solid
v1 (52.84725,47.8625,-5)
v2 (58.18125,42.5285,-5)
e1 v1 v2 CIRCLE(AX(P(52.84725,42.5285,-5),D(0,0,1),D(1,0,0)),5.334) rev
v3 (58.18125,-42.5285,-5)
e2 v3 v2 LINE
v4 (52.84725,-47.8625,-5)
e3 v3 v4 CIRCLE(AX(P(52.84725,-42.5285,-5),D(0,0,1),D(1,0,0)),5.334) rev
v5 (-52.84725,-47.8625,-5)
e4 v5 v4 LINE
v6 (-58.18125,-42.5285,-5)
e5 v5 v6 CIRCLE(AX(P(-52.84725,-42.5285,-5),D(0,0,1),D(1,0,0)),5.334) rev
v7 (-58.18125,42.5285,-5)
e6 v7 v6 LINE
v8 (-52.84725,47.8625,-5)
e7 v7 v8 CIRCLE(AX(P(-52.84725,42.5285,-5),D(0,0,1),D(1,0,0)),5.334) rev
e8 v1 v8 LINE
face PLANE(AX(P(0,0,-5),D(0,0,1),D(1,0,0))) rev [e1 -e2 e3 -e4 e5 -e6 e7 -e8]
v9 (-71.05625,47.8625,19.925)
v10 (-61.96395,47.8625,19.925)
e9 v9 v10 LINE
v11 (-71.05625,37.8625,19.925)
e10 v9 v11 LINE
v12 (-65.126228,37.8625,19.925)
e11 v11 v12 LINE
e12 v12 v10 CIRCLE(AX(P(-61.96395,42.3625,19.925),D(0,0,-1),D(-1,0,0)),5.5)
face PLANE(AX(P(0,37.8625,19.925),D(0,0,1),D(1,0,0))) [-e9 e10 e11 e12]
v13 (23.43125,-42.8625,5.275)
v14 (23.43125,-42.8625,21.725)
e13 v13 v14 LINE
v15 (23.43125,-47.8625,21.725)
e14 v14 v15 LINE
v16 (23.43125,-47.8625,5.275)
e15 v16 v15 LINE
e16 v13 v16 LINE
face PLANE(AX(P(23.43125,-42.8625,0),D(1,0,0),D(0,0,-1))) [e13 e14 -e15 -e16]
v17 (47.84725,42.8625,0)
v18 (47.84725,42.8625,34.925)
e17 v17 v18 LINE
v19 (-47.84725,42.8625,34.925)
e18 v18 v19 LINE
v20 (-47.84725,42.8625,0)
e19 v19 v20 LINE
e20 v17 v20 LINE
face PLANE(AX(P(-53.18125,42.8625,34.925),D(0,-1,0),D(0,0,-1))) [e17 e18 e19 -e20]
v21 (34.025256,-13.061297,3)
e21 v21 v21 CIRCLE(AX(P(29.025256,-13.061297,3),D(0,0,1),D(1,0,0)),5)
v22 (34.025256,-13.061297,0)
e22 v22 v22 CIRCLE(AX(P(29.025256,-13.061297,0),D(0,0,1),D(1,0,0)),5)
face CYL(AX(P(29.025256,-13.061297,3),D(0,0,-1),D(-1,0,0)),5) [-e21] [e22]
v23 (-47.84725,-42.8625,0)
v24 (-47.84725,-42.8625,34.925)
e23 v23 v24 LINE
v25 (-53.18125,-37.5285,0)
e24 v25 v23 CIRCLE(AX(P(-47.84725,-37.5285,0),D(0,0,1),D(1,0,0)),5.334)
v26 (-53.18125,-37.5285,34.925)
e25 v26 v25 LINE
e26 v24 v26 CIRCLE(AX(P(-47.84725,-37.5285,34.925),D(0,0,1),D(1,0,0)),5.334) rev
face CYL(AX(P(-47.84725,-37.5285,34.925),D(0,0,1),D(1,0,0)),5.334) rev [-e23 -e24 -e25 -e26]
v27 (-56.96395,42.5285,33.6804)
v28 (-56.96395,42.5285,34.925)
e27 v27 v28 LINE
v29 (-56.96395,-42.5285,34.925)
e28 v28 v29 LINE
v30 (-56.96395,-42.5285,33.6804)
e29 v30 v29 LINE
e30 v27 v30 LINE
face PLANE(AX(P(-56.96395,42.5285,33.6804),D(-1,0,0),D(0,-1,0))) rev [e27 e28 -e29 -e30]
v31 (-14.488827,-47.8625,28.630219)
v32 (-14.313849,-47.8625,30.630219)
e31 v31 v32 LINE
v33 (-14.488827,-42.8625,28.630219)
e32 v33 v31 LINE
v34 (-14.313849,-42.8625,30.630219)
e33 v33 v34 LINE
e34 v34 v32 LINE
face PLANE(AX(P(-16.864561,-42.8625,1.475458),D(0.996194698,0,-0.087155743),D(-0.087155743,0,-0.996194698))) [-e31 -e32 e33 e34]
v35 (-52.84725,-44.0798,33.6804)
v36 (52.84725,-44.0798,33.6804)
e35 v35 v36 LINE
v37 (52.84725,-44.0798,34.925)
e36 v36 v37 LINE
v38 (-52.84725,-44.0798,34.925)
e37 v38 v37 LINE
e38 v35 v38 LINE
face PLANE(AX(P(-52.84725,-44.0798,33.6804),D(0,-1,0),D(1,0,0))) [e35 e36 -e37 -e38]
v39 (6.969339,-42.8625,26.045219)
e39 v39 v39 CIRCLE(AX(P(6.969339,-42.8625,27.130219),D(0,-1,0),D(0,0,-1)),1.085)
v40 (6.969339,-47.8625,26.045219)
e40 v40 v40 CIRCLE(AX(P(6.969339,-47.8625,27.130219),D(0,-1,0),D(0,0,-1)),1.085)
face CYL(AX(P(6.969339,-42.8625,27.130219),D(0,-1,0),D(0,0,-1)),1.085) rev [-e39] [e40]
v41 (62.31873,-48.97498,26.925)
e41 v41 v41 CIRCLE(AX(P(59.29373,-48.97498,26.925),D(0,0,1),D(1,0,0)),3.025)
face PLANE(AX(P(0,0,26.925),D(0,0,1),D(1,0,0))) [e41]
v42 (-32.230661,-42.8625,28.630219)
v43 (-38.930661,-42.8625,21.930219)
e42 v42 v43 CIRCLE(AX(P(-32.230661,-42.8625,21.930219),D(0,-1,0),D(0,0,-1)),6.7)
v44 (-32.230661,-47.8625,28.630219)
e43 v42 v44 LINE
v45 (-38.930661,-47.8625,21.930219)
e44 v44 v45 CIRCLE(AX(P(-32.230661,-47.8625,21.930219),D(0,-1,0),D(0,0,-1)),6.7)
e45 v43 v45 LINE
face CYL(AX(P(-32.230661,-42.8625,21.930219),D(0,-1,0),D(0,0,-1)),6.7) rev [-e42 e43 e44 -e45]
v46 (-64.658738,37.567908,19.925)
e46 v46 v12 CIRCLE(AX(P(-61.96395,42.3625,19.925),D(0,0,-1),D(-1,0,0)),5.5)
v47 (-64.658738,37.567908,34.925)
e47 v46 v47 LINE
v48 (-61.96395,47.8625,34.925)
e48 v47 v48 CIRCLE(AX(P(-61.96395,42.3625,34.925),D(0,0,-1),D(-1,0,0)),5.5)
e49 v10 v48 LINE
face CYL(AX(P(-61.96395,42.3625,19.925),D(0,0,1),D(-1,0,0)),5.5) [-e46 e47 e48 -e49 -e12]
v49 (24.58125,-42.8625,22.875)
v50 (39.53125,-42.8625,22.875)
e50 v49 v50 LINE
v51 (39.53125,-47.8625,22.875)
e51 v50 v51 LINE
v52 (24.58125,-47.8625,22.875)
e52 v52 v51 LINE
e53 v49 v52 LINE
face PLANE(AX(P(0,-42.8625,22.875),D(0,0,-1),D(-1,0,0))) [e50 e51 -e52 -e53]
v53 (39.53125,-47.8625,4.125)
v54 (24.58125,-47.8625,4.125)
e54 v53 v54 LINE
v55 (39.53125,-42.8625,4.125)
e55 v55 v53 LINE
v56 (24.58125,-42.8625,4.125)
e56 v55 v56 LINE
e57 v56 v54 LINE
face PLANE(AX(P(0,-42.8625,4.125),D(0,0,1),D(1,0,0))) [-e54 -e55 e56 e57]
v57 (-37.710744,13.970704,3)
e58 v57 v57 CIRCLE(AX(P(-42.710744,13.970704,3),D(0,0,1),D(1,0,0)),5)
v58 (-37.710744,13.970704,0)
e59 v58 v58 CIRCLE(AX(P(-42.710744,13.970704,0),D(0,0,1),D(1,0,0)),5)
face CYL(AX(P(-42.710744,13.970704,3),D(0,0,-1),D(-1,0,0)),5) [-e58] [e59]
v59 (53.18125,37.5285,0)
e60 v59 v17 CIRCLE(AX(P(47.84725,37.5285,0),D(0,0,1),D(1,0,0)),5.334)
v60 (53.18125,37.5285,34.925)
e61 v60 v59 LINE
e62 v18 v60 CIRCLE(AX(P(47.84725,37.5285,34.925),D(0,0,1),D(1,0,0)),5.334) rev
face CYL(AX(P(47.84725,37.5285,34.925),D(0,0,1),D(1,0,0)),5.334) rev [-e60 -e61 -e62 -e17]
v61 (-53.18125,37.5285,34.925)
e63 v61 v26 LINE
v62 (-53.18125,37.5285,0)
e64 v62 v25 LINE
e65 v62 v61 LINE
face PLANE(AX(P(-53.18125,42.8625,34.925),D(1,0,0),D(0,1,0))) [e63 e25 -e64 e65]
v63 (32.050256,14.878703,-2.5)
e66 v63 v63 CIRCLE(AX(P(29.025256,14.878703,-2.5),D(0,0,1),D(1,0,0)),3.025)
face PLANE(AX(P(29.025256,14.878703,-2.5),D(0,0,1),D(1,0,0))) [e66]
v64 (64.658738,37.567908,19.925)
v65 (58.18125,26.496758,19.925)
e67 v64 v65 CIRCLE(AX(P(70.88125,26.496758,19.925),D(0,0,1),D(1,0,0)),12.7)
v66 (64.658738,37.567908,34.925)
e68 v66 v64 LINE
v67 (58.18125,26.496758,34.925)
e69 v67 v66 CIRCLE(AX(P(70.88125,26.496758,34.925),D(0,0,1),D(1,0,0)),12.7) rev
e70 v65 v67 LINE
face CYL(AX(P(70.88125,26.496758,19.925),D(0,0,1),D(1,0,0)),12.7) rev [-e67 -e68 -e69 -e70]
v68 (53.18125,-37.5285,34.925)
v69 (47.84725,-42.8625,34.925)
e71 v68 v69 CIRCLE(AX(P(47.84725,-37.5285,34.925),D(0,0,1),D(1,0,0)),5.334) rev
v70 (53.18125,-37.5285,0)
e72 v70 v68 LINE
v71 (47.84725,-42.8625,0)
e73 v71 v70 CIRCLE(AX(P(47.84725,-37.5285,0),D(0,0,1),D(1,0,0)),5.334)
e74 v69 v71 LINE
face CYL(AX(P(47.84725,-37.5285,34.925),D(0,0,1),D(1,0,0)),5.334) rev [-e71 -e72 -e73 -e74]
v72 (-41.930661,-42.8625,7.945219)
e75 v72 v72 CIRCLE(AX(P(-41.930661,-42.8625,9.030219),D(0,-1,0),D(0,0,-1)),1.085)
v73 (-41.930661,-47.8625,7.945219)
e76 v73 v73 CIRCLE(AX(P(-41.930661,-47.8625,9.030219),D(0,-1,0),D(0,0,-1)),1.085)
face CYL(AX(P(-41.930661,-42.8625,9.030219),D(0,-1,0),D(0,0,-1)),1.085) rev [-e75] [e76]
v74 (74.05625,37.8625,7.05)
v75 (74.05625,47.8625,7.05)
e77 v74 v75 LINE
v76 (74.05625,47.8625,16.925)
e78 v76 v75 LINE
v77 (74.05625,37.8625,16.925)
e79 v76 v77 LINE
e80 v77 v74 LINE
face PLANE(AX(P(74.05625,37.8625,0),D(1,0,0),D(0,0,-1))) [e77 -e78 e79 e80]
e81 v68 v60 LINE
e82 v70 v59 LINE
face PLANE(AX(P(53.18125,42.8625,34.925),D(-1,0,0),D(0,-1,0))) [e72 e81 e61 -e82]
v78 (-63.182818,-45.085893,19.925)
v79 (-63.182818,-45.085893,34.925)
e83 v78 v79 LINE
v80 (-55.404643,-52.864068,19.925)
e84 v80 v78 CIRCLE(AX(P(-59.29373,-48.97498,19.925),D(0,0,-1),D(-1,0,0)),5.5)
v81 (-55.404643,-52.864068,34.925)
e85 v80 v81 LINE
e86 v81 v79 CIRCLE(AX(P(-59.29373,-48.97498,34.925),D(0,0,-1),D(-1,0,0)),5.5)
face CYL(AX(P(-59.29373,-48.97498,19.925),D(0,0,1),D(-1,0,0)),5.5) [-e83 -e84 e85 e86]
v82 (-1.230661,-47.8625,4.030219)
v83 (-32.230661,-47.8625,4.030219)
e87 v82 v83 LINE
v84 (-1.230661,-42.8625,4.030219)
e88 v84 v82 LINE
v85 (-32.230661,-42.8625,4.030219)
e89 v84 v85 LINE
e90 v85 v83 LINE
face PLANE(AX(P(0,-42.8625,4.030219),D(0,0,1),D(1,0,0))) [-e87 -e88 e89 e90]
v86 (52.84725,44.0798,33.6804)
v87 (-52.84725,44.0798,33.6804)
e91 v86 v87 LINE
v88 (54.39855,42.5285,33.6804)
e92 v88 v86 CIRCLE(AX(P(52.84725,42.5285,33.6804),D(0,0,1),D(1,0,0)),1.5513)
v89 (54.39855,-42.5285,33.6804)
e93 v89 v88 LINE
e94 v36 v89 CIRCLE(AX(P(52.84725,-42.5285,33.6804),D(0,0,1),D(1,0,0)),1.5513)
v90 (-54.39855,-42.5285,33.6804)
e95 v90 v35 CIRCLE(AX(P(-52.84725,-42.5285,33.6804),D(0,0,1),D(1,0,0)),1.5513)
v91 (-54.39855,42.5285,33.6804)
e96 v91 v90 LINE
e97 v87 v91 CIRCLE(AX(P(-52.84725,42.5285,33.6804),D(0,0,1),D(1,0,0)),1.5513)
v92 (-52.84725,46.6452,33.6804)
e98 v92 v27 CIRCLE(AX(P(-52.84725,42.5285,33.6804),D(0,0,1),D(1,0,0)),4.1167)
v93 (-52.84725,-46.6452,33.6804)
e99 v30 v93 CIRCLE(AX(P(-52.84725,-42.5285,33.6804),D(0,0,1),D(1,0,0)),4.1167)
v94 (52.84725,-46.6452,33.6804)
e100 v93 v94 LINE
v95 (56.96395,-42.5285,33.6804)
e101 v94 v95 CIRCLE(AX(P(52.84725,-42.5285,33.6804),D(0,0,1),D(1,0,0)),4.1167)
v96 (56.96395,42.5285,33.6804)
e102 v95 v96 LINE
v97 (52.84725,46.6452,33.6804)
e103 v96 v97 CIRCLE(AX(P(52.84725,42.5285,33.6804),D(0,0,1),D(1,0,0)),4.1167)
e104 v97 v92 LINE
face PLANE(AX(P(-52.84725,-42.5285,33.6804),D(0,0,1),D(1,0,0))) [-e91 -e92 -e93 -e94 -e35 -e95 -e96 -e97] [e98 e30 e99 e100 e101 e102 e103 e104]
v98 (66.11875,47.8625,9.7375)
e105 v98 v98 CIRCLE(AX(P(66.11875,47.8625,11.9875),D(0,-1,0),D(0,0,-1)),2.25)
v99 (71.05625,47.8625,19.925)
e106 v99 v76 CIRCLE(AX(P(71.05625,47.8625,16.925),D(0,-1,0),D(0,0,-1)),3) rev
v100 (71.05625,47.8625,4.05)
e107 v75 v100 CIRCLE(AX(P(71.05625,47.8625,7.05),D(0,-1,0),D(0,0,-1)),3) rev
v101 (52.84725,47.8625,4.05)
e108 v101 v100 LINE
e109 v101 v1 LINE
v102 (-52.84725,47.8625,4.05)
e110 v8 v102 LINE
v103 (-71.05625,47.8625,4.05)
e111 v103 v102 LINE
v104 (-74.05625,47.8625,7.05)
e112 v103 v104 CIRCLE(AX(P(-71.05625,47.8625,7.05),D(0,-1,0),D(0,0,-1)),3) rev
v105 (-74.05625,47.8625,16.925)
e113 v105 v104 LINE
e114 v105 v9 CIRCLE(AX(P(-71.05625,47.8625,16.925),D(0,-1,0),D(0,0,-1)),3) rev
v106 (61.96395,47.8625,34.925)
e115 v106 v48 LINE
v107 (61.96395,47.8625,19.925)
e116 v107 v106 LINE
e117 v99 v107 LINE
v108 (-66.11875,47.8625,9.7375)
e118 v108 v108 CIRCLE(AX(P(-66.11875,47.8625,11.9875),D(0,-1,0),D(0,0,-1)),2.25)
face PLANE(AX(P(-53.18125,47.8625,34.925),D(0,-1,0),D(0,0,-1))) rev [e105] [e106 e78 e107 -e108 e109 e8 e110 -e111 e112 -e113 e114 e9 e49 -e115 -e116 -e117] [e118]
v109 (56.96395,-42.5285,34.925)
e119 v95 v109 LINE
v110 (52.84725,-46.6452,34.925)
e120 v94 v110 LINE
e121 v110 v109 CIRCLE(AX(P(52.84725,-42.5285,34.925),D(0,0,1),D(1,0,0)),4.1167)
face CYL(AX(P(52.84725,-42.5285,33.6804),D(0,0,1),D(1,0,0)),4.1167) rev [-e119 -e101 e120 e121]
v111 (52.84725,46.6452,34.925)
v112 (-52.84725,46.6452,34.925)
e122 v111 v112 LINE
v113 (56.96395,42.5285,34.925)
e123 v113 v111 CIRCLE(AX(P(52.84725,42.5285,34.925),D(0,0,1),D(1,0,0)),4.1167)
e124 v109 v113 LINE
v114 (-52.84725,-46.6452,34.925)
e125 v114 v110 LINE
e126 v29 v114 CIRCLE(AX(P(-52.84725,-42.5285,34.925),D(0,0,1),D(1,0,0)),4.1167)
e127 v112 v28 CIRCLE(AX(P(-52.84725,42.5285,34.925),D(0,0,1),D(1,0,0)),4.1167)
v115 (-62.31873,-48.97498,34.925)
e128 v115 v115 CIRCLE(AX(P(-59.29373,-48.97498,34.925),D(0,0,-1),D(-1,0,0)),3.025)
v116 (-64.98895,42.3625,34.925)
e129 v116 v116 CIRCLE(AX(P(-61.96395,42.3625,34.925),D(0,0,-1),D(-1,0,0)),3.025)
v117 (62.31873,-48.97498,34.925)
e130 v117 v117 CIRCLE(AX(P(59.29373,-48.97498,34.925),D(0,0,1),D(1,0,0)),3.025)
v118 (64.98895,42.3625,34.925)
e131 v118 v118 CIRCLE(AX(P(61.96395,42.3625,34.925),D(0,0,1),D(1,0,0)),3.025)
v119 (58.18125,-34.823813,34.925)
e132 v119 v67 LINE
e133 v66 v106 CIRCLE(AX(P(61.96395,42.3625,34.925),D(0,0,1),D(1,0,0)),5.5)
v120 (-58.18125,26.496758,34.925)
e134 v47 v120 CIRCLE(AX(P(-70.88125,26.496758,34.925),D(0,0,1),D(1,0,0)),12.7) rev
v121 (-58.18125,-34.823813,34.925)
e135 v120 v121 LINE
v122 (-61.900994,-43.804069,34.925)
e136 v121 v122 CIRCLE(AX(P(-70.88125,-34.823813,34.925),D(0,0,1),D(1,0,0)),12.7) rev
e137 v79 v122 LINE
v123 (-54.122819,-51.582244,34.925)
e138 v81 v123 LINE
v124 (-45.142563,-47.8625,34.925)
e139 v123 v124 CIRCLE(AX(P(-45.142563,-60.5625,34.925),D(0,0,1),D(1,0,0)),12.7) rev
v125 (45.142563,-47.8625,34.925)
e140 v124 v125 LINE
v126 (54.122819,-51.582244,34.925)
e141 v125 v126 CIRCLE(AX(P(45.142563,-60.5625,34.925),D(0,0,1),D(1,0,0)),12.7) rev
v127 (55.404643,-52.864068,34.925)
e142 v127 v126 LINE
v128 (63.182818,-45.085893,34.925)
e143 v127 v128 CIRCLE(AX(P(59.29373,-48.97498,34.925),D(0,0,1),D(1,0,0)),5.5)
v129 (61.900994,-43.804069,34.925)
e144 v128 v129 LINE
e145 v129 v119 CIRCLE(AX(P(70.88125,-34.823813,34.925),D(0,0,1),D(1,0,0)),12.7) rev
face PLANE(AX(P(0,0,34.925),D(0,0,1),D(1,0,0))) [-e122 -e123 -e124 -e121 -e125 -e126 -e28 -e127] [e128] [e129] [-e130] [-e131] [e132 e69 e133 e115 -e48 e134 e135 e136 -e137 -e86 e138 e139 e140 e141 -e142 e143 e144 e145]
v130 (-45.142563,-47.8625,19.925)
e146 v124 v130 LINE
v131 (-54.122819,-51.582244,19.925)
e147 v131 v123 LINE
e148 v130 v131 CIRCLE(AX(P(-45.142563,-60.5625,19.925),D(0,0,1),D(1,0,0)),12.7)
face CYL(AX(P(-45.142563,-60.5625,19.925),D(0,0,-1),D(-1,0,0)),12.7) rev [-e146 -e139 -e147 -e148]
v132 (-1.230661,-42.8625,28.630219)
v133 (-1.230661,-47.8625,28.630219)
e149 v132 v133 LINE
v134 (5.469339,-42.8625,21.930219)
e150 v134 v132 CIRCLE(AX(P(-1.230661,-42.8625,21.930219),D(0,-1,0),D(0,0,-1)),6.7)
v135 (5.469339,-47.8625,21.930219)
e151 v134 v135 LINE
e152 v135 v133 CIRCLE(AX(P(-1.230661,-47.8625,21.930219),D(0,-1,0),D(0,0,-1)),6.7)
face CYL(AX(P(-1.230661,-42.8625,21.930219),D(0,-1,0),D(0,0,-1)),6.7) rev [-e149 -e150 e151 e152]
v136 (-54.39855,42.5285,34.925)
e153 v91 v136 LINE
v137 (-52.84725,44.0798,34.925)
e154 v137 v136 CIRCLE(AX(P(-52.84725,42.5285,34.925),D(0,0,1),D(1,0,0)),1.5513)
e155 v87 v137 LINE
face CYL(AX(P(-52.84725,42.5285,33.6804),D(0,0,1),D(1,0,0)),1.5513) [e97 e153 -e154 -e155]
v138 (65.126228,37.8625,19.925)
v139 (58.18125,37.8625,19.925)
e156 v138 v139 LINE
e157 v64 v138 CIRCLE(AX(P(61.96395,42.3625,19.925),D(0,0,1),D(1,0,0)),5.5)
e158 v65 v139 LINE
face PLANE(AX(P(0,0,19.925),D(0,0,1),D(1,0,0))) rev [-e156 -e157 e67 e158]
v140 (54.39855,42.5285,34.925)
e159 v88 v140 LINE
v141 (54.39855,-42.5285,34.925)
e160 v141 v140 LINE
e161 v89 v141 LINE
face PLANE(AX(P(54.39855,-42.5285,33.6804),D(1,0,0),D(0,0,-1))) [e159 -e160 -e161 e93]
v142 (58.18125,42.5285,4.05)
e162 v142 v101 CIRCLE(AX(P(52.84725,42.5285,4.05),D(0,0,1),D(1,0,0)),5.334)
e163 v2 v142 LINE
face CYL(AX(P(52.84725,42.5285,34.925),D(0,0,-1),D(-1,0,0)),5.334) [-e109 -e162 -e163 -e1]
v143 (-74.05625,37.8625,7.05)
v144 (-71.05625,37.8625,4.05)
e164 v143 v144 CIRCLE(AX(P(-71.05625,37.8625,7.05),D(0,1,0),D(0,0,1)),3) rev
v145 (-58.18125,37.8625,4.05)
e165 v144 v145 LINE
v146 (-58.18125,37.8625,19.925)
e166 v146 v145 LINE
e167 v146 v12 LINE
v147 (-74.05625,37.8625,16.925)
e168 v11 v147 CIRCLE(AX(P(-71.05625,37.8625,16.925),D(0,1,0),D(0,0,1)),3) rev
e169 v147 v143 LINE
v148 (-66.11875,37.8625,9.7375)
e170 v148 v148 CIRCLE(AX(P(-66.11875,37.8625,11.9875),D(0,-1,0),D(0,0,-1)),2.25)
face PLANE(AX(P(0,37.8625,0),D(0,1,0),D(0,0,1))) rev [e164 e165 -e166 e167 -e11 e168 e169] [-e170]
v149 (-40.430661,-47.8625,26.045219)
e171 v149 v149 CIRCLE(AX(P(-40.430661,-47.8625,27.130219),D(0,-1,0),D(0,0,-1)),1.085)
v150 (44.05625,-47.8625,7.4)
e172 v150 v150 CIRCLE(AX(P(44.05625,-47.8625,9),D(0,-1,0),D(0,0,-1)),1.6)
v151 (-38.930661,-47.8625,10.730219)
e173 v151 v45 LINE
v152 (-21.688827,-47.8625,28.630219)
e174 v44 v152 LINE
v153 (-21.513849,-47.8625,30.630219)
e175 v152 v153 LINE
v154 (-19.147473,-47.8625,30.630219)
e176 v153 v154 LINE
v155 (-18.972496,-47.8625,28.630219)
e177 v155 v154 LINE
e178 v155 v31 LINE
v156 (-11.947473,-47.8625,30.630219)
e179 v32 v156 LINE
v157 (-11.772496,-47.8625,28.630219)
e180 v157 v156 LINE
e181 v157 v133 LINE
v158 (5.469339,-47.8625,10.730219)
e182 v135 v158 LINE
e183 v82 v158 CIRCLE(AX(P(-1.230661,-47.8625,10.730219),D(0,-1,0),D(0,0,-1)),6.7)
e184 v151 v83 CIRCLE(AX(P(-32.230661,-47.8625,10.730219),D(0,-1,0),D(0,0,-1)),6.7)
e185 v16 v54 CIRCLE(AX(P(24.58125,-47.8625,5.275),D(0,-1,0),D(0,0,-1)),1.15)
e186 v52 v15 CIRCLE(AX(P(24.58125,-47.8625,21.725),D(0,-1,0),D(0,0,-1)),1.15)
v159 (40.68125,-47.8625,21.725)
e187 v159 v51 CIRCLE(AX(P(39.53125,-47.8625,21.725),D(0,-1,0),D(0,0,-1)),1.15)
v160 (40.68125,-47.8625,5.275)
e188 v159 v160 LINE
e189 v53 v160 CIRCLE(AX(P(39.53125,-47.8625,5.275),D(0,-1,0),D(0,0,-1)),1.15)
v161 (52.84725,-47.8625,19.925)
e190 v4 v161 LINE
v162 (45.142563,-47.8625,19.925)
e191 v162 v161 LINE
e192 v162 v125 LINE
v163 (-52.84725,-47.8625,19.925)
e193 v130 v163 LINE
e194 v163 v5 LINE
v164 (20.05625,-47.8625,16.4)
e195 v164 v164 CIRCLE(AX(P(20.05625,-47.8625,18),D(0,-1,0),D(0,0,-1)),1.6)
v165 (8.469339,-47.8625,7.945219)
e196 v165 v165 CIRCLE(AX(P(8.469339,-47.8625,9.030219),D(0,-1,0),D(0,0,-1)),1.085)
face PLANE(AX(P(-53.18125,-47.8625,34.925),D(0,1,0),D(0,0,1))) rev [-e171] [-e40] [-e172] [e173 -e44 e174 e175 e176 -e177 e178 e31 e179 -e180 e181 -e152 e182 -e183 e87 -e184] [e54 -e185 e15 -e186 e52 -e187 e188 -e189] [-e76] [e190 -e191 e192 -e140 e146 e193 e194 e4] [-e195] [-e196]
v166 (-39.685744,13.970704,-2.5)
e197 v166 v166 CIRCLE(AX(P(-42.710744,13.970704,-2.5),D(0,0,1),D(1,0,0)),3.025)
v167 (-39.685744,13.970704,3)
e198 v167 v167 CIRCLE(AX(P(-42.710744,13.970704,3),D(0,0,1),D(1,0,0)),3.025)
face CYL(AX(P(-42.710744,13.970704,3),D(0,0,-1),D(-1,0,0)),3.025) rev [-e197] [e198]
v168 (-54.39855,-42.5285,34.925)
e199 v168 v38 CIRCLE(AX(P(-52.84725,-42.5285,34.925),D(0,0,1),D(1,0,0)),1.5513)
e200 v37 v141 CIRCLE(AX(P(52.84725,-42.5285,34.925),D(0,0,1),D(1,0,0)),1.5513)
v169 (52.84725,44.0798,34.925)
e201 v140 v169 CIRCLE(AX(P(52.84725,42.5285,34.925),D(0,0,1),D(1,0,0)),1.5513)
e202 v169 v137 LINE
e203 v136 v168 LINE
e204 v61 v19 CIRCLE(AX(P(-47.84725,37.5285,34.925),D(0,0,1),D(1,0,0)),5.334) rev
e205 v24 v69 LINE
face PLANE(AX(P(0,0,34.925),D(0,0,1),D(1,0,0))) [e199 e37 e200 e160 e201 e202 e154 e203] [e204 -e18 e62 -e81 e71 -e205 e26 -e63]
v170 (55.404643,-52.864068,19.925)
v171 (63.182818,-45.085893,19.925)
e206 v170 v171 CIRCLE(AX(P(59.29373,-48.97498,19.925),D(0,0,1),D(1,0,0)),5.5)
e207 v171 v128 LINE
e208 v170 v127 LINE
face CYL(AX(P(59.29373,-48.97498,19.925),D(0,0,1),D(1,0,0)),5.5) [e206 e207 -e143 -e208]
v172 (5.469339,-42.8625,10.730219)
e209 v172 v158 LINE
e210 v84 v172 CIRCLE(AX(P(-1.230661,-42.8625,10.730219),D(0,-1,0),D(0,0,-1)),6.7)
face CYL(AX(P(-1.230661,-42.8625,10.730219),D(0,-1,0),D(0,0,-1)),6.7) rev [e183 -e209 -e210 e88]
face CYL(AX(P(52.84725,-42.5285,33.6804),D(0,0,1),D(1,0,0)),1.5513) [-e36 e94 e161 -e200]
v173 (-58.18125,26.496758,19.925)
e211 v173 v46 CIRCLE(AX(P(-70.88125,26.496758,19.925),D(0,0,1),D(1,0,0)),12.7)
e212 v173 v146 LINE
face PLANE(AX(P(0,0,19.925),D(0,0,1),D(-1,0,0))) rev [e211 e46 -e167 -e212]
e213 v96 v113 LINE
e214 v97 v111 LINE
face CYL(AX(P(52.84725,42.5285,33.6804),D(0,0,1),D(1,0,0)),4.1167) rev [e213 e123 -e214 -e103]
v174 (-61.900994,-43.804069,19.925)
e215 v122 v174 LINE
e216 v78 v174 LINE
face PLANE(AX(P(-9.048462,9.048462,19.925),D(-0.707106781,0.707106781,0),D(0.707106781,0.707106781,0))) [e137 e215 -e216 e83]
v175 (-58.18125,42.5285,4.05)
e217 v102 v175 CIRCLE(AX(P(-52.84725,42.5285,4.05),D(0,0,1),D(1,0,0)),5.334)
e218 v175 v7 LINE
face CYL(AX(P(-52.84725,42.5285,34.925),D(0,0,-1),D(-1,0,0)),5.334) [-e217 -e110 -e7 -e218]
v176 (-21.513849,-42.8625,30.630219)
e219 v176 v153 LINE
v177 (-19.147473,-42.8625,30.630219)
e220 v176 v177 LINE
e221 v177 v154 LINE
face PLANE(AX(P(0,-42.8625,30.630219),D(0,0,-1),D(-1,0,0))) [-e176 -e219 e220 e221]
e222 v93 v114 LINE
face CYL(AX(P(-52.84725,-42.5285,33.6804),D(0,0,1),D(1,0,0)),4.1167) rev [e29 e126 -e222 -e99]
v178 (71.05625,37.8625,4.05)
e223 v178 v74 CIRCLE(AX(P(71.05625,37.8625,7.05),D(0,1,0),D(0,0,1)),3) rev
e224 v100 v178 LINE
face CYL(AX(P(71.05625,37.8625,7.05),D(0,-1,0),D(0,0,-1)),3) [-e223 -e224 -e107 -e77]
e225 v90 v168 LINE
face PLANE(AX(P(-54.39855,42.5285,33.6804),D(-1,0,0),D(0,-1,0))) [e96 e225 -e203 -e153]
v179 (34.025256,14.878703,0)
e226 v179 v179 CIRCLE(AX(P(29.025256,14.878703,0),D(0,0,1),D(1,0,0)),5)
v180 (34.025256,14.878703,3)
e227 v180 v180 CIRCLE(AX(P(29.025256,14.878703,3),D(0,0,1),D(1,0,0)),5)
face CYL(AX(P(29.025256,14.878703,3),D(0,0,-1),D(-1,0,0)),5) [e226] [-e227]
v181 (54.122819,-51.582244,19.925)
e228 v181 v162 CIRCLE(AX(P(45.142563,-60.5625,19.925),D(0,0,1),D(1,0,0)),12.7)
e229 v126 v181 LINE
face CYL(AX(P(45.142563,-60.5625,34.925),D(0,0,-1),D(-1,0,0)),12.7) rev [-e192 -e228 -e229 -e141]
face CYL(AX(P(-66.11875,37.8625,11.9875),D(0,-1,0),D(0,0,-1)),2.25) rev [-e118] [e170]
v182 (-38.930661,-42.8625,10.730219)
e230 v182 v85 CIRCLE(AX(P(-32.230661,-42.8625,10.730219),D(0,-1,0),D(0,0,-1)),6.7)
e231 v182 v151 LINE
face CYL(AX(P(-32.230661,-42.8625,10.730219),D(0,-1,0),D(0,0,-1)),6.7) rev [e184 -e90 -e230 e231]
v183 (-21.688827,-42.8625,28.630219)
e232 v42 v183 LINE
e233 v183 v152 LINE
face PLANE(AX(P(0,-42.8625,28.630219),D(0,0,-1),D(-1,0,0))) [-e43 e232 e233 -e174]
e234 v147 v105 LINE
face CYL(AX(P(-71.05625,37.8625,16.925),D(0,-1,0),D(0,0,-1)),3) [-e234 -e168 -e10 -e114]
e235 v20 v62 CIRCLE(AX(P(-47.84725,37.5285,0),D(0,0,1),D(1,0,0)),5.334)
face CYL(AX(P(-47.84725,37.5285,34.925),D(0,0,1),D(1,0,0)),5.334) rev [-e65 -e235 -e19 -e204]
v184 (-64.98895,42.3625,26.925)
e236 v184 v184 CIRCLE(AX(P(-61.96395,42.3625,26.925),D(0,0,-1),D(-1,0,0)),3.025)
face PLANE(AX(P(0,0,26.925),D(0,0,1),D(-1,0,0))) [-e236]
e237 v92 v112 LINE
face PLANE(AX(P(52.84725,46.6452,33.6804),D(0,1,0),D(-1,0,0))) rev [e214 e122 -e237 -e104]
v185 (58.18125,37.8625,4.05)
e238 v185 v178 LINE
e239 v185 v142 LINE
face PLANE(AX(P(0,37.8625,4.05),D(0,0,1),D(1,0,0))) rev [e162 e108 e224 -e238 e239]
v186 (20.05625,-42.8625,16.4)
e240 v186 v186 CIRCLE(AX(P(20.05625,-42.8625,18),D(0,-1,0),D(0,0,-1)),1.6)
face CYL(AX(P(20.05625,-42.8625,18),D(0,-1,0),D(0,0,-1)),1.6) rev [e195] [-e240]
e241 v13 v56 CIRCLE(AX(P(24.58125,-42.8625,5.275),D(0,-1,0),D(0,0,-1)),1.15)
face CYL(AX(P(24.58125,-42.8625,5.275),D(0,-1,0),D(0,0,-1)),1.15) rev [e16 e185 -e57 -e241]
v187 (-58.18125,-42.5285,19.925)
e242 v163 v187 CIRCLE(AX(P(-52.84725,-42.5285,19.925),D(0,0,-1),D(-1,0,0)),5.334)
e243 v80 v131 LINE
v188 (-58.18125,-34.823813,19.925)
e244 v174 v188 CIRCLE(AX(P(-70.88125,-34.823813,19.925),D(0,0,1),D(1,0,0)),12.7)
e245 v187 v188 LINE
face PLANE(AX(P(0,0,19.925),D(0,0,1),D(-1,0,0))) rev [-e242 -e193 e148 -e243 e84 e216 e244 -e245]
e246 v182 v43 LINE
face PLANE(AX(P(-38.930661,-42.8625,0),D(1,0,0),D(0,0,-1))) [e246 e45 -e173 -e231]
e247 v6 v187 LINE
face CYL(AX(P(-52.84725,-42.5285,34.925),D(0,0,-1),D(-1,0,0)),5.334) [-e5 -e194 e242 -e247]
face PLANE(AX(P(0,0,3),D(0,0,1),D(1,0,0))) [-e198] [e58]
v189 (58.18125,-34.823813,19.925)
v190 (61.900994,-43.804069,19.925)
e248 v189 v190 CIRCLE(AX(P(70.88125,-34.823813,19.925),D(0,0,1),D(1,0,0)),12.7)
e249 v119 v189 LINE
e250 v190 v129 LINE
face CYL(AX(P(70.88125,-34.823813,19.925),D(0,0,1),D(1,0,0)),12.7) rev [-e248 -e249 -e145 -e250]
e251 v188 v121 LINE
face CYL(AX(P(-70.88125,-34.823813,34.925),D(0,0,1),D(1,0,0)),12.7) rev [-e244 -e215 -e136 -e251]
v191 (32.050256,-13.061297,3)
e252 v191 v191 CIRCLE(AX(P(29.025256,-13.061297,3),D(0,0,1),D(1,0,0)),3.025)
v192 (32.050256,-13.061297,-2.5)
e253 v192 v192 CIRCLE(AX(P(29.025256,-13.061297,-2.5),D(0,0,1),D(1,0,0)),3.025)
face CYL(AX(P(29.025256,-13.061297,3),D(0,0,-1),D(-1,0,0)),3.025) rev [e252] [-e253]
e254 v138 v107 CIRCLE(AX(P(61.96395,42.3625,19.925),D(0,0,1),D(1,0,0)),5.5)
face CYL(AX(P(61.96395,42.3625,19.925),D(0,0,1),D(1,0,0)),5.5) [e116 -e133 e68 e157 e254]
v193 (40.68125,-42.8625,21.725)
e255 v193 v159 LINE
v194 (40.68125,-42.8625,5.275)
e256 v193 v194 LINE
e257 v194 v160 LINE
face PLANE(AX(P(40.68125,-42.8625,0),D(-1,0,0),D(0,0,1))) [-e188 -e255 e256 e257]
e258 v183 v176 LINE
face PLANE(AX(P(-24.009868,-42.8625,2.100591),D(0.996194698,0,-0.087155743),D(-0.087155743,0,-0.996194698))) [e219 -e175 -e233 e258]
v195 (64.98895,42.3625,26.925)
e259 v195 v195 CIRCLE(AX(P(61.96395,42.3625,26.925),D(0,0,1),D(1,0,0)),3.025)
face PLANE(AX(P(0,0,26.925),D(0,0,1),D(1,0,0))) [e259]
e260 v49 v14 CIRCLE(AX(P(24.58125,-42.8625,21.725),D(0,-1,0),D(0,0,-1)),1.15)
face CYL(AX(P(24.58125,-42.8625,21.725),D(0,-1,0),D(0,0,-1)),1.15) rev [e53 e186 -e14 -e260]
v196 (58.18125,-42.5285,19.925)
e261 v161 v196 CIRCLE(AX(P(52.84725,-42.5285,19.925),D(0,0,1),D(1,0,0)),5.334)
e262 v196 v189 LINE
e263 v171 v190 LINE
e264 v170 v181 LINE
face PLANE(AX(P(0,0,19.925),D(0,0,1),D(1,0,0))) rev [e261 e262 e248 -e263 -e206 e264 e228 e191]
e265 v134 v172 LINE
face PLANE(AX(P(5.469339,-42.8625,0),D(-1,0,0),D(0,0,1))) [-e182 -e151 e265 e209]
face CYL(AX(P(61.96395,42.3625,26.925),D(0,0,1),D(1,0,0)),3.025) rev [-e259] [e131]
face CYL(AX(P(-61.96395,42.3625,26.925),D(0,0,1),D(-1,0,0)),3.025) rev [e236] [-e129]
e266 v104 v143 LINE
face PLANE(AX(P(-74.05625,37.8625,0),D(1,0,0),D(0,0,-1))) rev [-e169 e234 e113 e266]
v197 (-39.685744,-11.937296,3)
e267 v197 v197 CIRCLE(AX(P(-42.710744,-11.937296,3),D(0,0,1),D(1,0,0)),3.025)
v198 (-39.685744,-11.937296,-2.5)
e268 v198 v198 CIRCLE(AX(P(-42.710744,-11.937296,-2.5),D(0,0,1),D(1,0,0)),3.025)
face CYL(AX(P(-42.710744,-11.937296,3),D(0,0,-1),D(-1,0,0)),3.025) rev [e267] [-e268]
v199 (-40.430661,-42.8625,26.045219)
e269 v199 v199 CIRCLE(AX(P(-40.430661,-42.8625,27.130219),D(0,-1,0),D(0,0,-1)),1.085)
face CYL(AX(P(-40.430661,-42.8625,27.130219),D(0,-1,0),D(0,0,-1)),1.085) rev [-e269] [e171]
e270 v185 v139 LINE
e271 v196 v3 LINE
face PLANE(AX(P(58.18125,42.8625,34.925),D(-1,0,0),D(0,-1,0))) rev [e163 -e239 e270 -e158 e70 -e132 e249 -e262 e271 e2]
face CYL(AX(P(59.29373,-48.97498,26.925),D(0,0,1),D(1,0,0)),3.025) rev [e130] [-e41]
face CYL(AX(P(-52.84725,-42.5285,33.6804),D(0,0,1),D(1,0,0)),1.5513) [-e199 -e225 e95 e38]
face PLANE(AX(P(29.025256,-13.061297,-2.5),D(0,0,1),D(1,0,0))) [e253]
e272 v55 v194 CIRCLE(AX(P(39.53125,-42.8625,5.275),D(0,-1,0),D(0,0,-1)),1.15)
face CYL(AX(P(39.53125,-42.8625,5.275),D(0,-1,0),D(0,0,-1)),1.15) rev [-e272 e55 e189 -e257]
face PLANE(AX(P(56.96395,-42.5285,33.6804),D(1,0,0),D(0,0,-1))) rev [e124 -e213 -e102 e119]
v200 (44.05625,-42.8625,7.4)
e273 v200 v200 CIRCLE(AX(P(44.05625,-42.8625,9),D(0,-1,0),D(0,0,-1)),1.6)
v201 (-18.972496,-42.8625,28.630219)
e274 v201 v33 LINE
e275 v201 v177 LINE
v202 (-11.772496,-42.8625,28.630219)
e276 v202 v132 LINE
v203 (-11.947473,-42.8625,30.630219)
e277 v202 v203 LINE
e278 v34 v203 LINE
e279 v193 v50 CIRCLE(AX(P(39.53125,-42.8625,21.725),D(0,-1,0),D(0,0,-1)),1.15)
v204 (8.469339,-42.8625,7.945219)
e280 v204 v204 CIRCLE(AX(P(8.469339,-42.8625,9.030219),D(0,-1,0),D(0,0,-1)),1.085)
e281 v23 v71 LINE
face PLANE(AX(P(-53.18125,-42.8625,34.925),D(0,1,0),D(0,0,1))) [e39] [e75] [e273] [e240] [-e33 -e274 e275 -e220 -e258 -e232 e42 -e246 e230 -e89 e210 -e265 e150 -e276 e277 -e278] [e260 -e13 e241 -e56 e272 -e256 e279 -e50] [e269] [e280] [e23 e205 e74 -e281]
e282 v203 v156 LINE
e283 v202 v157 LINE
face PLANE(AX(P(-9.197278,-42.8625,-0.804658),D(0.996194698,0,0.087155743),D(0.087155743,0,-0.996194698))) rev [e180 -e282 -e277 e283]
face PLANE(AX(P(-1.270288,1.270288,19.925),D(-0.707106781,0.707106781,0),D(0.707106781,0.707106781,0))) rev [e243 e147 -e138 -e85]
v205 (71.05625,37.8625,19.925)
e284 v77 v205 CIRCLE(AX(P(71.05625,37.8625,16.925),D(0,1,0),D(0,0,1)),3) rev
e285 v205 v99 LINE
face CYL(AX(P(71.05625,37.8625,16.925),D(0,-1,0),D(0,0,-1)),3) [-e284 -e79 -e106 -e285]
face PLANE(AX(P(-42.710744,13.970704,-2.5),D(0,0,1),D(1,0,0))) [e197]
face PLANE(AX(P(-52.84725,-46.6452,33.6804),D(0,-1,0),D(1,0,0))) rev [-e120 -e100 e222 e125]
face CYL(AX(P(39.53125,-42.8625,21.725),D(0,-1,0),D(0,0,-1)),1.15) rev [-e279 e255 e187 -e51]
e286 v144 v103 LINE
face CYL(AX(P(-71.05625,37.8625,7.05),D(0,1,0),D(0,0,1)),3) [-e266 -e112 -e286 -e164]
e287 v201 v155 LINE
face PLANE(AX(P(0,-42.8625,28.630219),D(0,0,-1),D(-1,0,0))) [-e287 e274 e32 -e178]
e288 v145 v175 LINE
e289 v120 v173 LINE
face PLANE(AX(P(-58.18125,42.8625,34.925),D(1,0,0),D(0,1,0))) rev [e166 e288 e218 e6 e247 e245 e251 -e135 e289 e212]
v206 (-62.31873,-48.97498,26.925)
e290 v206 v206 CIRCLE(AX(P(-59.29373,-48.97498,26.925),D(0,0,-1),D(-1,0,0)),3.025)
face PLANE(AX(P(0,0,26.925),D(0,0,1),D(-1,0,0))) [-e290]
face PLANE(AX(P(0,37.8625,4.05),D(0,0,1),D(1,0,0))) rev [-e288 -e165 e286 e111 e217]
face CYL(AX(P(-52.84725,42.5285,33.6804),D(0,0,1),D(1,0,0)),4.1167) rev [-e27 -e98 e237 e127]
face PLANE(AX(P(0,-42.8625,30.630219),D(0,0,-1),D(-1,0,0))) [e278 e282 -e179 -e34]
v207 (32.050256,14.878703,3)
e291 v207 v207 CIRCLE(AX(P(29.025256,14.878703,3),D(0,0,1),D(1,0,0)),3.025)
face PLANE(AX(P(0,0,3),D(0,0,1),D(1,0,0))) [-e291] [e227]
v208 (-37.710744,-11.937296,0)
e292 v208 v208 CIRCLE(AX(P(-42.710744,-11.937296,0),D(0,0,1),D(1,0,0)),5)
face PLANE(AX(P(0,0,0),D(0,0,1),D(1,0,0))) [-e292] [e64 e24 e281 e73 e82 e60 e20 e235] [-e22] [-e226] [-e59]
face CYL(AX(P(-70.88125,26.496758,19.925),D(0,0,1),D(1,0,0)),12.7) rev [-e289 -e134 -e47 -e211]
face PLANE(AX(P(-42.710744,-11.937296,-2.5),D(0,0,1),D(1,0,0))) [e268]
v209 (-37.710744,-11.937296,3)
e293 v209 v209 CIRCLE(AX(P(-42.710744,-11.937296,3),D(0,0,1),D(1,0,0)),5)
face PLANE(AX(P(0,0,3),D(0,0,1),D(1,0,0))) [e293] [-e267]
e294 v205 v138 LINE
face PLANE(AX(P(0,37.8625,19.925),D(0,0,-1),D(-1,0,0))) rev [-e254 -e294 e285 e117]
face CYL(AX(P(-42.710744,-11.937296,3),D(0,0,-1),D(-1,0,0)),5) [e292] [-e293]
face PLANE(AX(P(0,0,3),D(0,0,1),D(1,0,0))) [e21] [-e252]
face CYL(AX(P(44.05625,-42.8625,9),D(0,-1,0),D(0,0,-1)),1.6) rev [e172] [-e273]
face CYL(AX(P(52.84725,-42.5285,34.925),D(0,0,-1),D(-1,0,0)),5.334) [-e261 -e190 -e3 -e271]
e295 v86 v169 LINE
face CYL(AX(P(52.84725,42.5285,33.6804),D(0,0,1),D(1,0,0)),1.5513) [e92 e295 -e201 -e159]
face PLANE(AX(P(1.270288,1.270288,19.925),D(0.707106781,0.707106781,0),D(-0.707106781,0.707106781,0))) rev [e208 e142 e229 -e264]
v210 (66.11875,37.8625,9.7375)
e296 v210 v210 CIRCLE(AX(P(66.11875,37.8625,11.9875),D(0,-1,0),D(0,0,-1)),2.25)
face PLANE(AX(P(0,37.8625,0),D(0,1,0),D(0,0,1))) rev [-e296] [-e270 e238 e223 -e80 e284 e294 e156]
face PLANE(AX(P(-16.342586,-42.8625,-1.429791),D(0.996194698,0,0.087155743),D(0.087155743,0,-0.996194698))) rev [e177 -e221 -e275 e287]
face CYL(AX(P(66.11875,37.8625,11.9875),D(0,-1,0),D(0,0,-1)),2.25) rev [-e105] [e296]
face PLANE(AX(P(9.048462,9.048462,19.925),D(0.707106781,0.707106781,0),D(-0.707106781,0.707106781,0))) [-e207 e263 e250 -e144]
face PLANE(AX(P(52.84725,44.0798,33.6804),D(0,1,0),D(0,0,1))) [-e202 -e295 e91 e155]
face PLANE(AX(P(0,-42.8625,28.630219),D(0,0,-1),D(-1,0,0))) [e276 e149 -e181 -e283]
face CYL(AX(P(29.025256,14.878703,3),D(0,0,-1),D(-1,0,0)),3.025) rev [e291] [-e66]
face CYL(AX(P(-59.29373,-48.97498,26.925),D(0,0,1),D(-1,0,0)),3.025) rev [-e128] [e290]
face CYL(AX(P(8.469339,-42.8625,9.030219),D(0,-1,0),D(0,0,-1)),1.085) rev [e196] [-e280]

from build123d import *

# Parameters (mm, degrees)
SKETCH1_W             = 106.3625
SKETCH1_H             = 85.725
BOSS_EXTRUDE1_DEPTH   = 34.925
SHELL1_T              = 5
FILLET1_R             = 5.334
CUT_EXTRUDE1_DEPTH    = 1.2446
BOSS_EXTRUDE2_DEPTH   = 15
BOSS_EXTRUDE2_2_DEPTH = 15
SKETCH5_R             = 3.025
CUT_EXTRUDE4_DEPTH    = 8
FILLET2_R             = 12.7
BOSS_EXTRUDE4_DEPTH   = 10
BOSS_EXTRUDE5_REACH   = 133.061
SKETCH9_W             = 5.334
SKETCH9_H             = 15.875
FILLET3_R             = 3
BOSS_EXTRUDE6_REACH   = 133.061
SKETCH12_W            = 5.334
SKETCH12_H            = 15.875
M4_CLEARANCE_HOLE1_D  = 4.5
SKETCH13_R            = 1.6
CUT_EXTRUDE6_DEPTH    = 5
SKETCH15_R            = 5
SKETCH15_R_2          = 3.025
BOSS_EXTRUDE7_DEPTH   = 3
CUT_EXTRUDE7_START    = -2.5
SKETCH16_R            = 3.025
CUT_EXTRUDE7_DEPTH    = 2.5


with BuildPart() as part:
    # Sketch1 → Boss-Extrude1 (new body)
    with BuildSketch(Plane.XY):
        Rectangle(SKETCH1_W, SKETCH1_H)
    extrude(amount=BOSS_EXTRUDE1_DEPTH)

    # Shell1
    shell1_openings = [part.faces().sort_by_distance(p)[0] for p in [
        (0, 0, 34.925),
    ]]
    offset(amount=SHELL1_T, openings=shell1_openings, kind=Kind.INTERSECTION)

    # Fillet1
    # the kernel refuses this fillet: 5.334 mm, written as the material it adds along each edge
    with BuildSketch(Plane(origin=(53.18125, -42.8625, 0), x_dir=(0, 1, 0), z_dir=(0, 0, 1)), Plane(origin=(53.18125, 42.8625, 0), x_dir=(-1, 0, 0), z_dir=(0, 0, 1)), Plane(origin=(-53.18125, -42.8625, 0), x_dir=(1, 0, 0), z_dir=(0, 0, 1))) as fillet1_piece_1:
        with BuildLine():
            CenterArc((FILLET1_R, FILLET1_R), FILLET1_R, 180, 90)
            Line((0, FILLET1_R), (0, 0))
            Line((0, 0), (FILLET1_R, 0))
        make_face()
    extrude(amount=34.925)
    with BuildSketch(Plane(origin=(-53.18125, 42.8625, 0), x_dir=(1, 0, 0), z_dir=(0, 0, 1))) as fillet1_piece_2:
        with BuildLine():
            CenterArc((FILLET1_R, -FILLET1_R), FILLET1_R, 90, 90)
            Line((0, -FILLET1_R), (0, 0))
            Line((0, 0), (FILLET1_R, 0))
        make_face()
    extrude(amount=34.925)
    # the kernel refuses this fillet: 5.334 mm, written as the material it takes off along each edge
    with BuildSketch(Plane(origin=(58.18125, -47.8625, 48.26), x_dir=(-1, 0, 0), z_dir=(0, 0, -1)), Plane(origin=(-58.18125, 47.8625, -18.335), x_dir=(0, -1, 0), z_dir=(0, 0, 1))) as fillet1_2_piece_1:
        with BuildLine():
            CenterArc((FILLET1_R, FILLET1_R), FILLET1_R, 180, 90)
            Line((0, FILLET1_R), (0, 0))
            Line((0, 0), (FILLET1_R, 0))
        make_face()
    extrude(amount=66.595, mode=Mode.SUBTRACT)
    with BuildSketch(Plane(origin=(-58.18125, -47.8625, 48.26), x_dir=(1, 0, 0), z_dir=(0, 0, -1)), Plane(origin=(58.18125, 47.8625, 48.26), x_dir=(-1, 0, 0), z_dir=(0, 0, -1))) as fillet1_2_piece_2:
        with BuildLine():
            CenterArc((FILLET1_R, -FILLET1_R), FILLET1_R, 90, 90)
            Line((0, -FILLET1_R), (0, 0))
            Line((0, 0), (FILLET1_R, 0))
        make_face()
    extrude(amount=66.595, mode=Mode.SUBTRACT)

    # Sketch2 → Cut-Extrude1 (cut)
    with BuildSketch(Plane.XY.offset(34.925)):
        with BuildLine():
            Line((-52.84725, -46.6452), (52.84725, -46.6452))
            ThreePointArc((52.84725, -46.6452), (55.758196486, -45.439446486), (56.96395, -42.5285))
            Line((56.96395, -42.5285), (56.96395, 42.5285))
            ThreePointArc((56.96395, 42.5285), (55.758196486, 45.439446486), (52.84725, 46.6452))
            Line((52.84725, 46.6452), (-52.84725, 46.6452))
            ThreePointArc((-52.84725, 46.6452), (-55.758196486, 45.439446486), (-56.96395, 42.5285))
            Line((-56.96395, 42.5285), (-56.96395, -42.5285))
            ThreePointArc((-56.96395, -42.5285), (-55.758196486, -45.439446486), (-52.84725, -46.6452))
        make_face()
        with BuildLine():
            Line((-54.39855, 42.5285), (-54.39855, -42.5285))
            ThreePointArc((-54.39855, -42.5285), (-53.94418475, -43.62543475), (-52.84725, -44.0798))
            Line((-52.84725, -44.0798), (52.84725, -44.0798))
            ThreePointArc((52.84725, -44.0798), (53.94418475, -43.62543475), (54.39855, -42.5285))
            Line((54.39855, -42.5285), (54.39855, 42.5285))
            ThreePointArc((54.39855, 42.5285), (53.94418475, 43.62543475), (52.84725, 44.0798))
            Line((52.84725, 44.0798), (-52.84725, 44.0798))
            ThreePointArc((-52.84725, 44.0798), (-53.94418475, 43.62543475), (-54.39855, 42.5285))
        make_face(mode=Mode.SUBTRACT)
    extrude(amount=-CUT_EXTRUDE1_DEPTH, mode=Mode.SUBTRACT)


with BuildPart() as body_2:
    # Sketch4 → Boss-Extrude2 (new body)
    with BuildSketch(Plane.XY.offset(34.925)):
        with BuildLine():
            ThreePointArc((52.84725, 47.8625), (56.618957571, 46.300207571), (58.18125, 42.5285))
            Line((58.18125, 42.5285), (58.18125, 36.8625))
            Line((58.18125, 36.8625), (61.96395, 36.8625))
            ThreePointArc((61.96395, 36.8625), (67.46395, 42.3625), (61.96395, 47.8625))
            Line((61.96395, 47.8625), (52.84725, 47.8625))
        make_face()
    extrude(amount=-BOSS_EXTRUDE2_DEPTH)


with BuildPart() as body_3:
    # Sketch4 → Boss-Extrude2 2 (new body)
    with BuildSketch(Plane.XY.offset(34.925)):
        with BuildLine():
            Line((63.182817689, -45.085893096), (58.18125, -40.084325407))
            Line((58.18125, -40.084325407), (58.18125, -42.5285))
            ThreePointArc((58.18125, -42.5285), (57.775223426, -44.569733428), (56.618957571, -46.300207571))
            ThreePointArc((56.618957571, -46.300207571), (54.888483428, -47.456473426), (52.84725, -47.8625))
            Line((52.84725, -47.8625), (50.403075407, -47.8625))
            Line((50.403075407, -47.8625), (55.404643096, -52.864067689))
            ThreePointArc((55.404643096, -52.864067689), (63.182817689, -52.864067689), (63.182817689, -45.085893096))
        make_face()
    extrude(amount=-BOSS_EXTRUDE2_2_DEPTH)


with BuildPart() as cut_extrude4_tool:
    # Sketch5 → Cut-Extrude4 (new body)
    with BuildSketch(Plane.XY.offset(34.925)):
        with Locations((59.293730392, -48.974980392)):
            Circle(SKETCH5_R)
        with Locations((61.96395, 42.3625)):
            Circle(SKETCH5_R)
    extrude(amount=-CUT_EXTRUDE4_DEPTH)


with BuildPart() as body_2_1:
    add(body_2.part)

    # Cut-Extrude4: cut by cut_extrude4_tool
    add(cut_extrude4_tool.part, mode=Mode.SUBTRACT)


with BuildPart() as body_3_1:
    add(body_3.part)

    # Cut-Extrude4: cut by cut_extrude4_tool
    add(cut_extrude4_tool.part, mode=Mode.SUBTRACT)


with BuildPart() as body_4:
    # Mirror3: mirrored copy
    add(body_3_1.part.mirror(Plane(origin=(0, 0, 0), x_dir=(0, 0, 1), z_dir=(1, 0, 0))))


with BuildPart() as body_5:
    # Mirror3 2: mirrored copy
    add(body_2_1.part.mirror(Plane(origin=(0, 0, 0), x_dir=(0, 0, 1), z_dir=(1, 0, 0))))


with BuildPart() as part_1:
    add(part.part)

    # Combine3: union body 3, body 2, body 4, body 5
    add(body_3_1.part)
    add(body_2_1.part)
    add(body_4.part)
    add(body_5.part)

    # Fillet2
    # the kernel refuses this fillet: 12.7 mm, written as the material it adds along each edge
    with BuildSketch(Plane(origin=(-58.18125, 36.8625, 34.925), x_dir=(-0.994122467087749, 0.10826135243644212, 0), z_dir=(0, 0, -1))) as fillet2_piece_1_section:
        with BuildLine():
            CenterArc((11.503146113, -11.67973592), FILLET2_R, 113.1229538, 60.661946359)
            Line((-1.122209219, -10.304816744), (-2.384744752, -10.167324826))
            Line((-2.384744752, -10.167324826), (-1.262535533, 0.137491918))
            Line((-1.262535533, 0.137491918), (0.137491918, 1.262535533))
            ThreePointArc((0.137491918, 1.262535533), (3.897958974, 0.853015315), (6.017049113, 1.167973592))
            Line((6.017049113, 1.167973592), (6.515785204, 0))
        make_face()
    fillet2_piece_1 = extrude(amount=15, mode=Mode.PRIVATE)
    fillet2_piece_1 = split(fillet2_piece_1, bisect_by=Plane(origin=(-56.96395, 32.923012579, 34.3027), z_dir=(-1, 0, 0)), keep=Keep.TOP, mode=Mode.PRIVATE)
    add(fillet2_piece_1)
    with BuildSketch(Plane(origin=(-50.403075407, -47.8625, 34.925), x_dir=(-0.7071067811865455, -0.7071067811865495, 0), z_dir=(0, 0, -1)), Plane(origin=(-58.18125, -40.084325407, 34.925), x_dir=(0, 1, 0), z_dir=(0, 0, -1)), Plane(origin=(58.18125, -40.084325407, 34.925), x_dir=(0.7071067811865482, -0.7071067811865468, 0), z_dir=(0, 0, -1))) as fillet2_piece_2:
        with BuildLine():
            CenterArc((FILLET2_R * 0.414213562373, -FILLET2_R), FILLET2_R, 90, 45)
            Line((-FILLET2_R * 0.292893218813, -FILLET2_R * 0.292893218813), (0, 0))
            Line((0, 0), (FILLET2_R * 0.414213562373, 0))
        make_face()
    extrude(amount=15)
    with BuildSketch(Plane(origin=(50.403075407, -47.8625, 34.925), x_dir=(0.7071067811865455, -0.7071067811865495, 0), z_dir=(0, 0, -1))) as fillet2_piece_3:
        with BuildLine():
            CenterArc((FILLET2_R * 0.414213562373, FILLET2_R), FILLET2_R, 225, 45)
            Line((-FILLET2_R * 0.292893218813, FILLET2_R * 0.292893218813), (0, 0))
            Line((0, 0), (FILLET2_R * 0.414213562373, 0))
        make_face()
    extrude(amount=15)
    with BuildSketch(Plane(origin=(58.18125, 36.8625, 34.925), x_dir=(0, -1, 0), z_dir=(0, 0, -1))) as fillet2_piece_4_section:
        with BuildLine():
            CenterArc((10.365741732, -12.7), FILLET2_R, 90, 60.661946359)
            Line((-0.705407718, -6.477488462), (-1.812522663, -5.855237308))
            ThreePointArc((-1.812522663, -5.855237308), (-1.27, -3.7827), (-1.27, 0))
            Line((-1.27, 0), (0, 1.27))
            Line((0, 1.27), (10.365741732, 1.27))
            Line((10.365741732, 1.27), (10.365741732, 0))
        make_face()
    fillet2_piece_4 = extrude(amount=15, mode=Mode.PRIVATE)
    fillet2_piece_4 = split(fillet2_piece_4, bisect_by=Plane(origin=(56.96395, 32.923012579, 34.3027), z_dir=(1, 0, 0)), keep=Keep.TOP, mode=Mode.PRIVATE)
    add(fillet2_piece_4)

    # Sketch8 → Boss-Extrude4 (add)
    with BuildSketch(Plane(origin=(0, 47.8625, 0), x_dir=(1, 0, 0), z_dir=(0, 1, 0))):
        with BuildLine():
            Line((-58.18125, -19.925), (-58.18125, -4.05))
            Line((-58.18125, -4.05), (-64.704536438, -10.573286438))
            ThreePointArc((-64.704536438, -10.573286438), (-64.270990935, -11.222133135), (-64.11875, -11.9875))
            ThreePointArc((-64.11875, -11.9875), (-65.353383135, -13.835259065), (-67.532963562, -13.401713562))
            Line((-67.532963562, -13.401713562), (-74.05625, -19.925))
            Line((-74.05625, -19.925), (-58.18125, -19.925))
        make_face()
        with BuildLine():
            Line((-64.704536438, -10.573286438), (-58.18125, -4.05))
            Line((-58.18125, -4.05), (-74.05625, -4.05))
            Line((-74.05625, -4.05), (-74.05625, -19.925))
            Line((-74.05625, -19.925), (-67.532963562, -13.401713562))
            ThreePointArc((-67.532963562, -13.401713562), (-67.532963562, -10.573286438), (-64.704536438, -10.573286438))
        make_face()
        with BuildLine():
            ThreePointArc((-64.11875, -11.9875), (-64.270990935, -11.222133135), (-64.704536438, -10.573286438))
            Line((-64.704536438, -10.573286438), (-67.532963562, -13.401713562))
            ThreePointArc((-67.532963562, -13.401713562), (-65.353383135, -13.835259065), (-64.11875, -11.9875))
        make_face()
        with BuildLine():
            Line((-67.532963562, -13.401713562), (-64.704536438, -10.573286438))
            ThreePointArc((-64.704536438, -10.573286438), (-67.532963562, -10.573286438), (-67.532963562, -13.401713562))
        make_face()
        with BuildLine():
            Line((74.05625, -4.05), (58.18125, -4.05))
            Line((58.18125, -4.05), (58.18125, -19.925))
            Line((58.18125, -19.925), (64.704536438, -13.401713562))
            ThreePointArc((64.704536438, -13.401713562), (64.704536438, -10.573286438), (67.532963562, -10.573286438))
            Line((67.532963562, -10.573286438), (74.05625, -4.05))
        make_face()
        with BuildLine():
            ThreePointArc((67.532963562, -10.573286438), (64.704536438, -10.573286438), (64.704536438, -13.401713562))
            Line((64.704536438, -13.401713562), (67.532963562, -10.573286438))
        make_face()
        with BuildLine():
            Line((67.532963562, -10.573286438), (64.704536438, -13.401713562))
            ThreePointArc((64.704536438, -13.401713562), (66.884116865, -13.835259065), (68.11875, -11.9875))
            ThreePointArc((68.11875, -11.9875), (67.966509065, -11.222133135), (67.532963562, -10.573286438))
        make_face()
        with BuildLine():
            Line((64.704536438, -13.401713562), (58.18125, -19.925))
            Line((58.18125, -19.925), (61.96395, -19.925))
            Line((61.96395, -19.925), (74.05625, -19.925))
            Line((74.05625, -19.925), (74.05625, -4.05))
            Line((74.05625, -4.05), (67.532963562, -10.573286438))
            ThreePointArc((67.532963562, -10.573286438), (67.966509065, -11.222133135), (68.11875, -11.9875))
            ThreePointArc((68.11875, -11.9875), (66.884116865, -13.835259065), (64.704536438, -13.401713562))
        make_face()
    extrude(amount=-BOSS_EXTRUDE4_DEPTH)

    # Sketch9 → Boss-Extrude5 (add, up to next)
    with BuildSketch(Plane(origin=(0, 47.8625, 0), x_dir=(1, 0, 0), z_dir=(0, 1, 0)), mode=Mode.PRIVATE) as boss_extrude5_sk1:
        with Locations((-55.51425, -11.9875)):
            Rectangle(SKETCH9_W, SKETCH9_H)
    boss_extrude5_tool1 = extrude(boss_extrude5_sk1.sketch, amount=-BOSS_EXTRUDE5_REACH, mode=Mode.PRIVATE) - part_1.part
    add(boss_extrude5_tool1.solids().sort_by_distance((-55.51425, 47.8625, 11.9875))[0])

    # Fillet3
    fillet3_edges = [part_1.edges().sort_by_distance(p)[0] for p in [
        (-74.05625, 42.8625, 19.925),
        (-74.05625, 42.8625, 4.05),
        (74.05625, 42.8625, 4.05),
        (74.05625, 42.8625, 19.925),
    ]]
    fillet(fillet3_edges, radius=FILLET3_R)

    # Sketch12 → Boss-Extrude6 (add, up to next)
    with BuildSketch(Plane(origin=(0, 47.8625, 0), x_dir=(1, 0, 0), z_dir=(0, 1, 0)), mode=Mode.PRIVATE) as boss_extrude6_sk1:
        with Locations((55.51425, -11.9875)):
            Rectangle(SKETCH12_W, SKETCH12_H)
    boss_extrude6_tool1 = extrude(boss_extrude6_sk1.sketch, amount=-BOSS_EXTRUDE6_REACH, mode=Mode.PRIVATE) - part_1.part
    add(boss_extrude6_tool1.solids().sort_by_distance((55.51425, 47.8625, 11.9875))[0])

    # M4 Clearance Hole1 (through all)
    with Locations(Plane(origin=(0, 37.8625, 0), x_dir=(-1, 0, 0), z_dir=(0, -1, 0))):
        with Locations((66.11875, -11.9875), (-66.11875, -11.9875)):
            Hole(M4_CLEARANCE_HOLE1_D / 2)

    # Sketch13 → Cut-Extrude6 (cut)
    with BuildSketch(Plane.XZ.offset(47.8625)):
        with BuildLine():
            Line((5.469338815, 21.930218955), (5.469338815, 10.730218955))
            ThreePointArc((5.469338815, 10.730218955), (3.506954249, 5.992603521), (-1.230661185, 4.030218955))
            Line((-1.230661185, 4.030218955), (-32.230661185, 4.030218955))
            ThreePointArc((-32.230661185, 4.030218955), (-36.968276619, 5.992603521), (-38.930661185, 10.730218955))
            Line((-38.930661185, 10.730218955), (-38.930661185, 21.930218955))
            ThreePointArc((-38.930661185, 21.930218955), (-36.968276619, 26.667834389), (-32.230661185, 28.630218955))
            Line((-32.230661185, 28.630218955), (-21.688826772, 28.630218955))
            Line((-21.688826772, 28.630218955), (-21.513849445, 30.630218955))
            Line((-21.513849445, 30.630218955), (-19.147472925, 30.630218955))
            Line((-19.147472925, 30.630218955), (-18.972495598, 28.630218955))
            Line((-18.972495598, 28.630218955), (-14.488826772, 28.630218955))
            Line((-14.488826772, 28.630218955), (-14.313849445, 30.630218955))
            Line((-14.313849445, 30.630218955), (-11.947472925, 30.630218955))
            Line((-11.947472925, 30.630218955), (-11.772495598, 28.630218955))
            Line((-11.772495598, 28.630218955), (-1.230661185, 28.630218955))
            ThreePointArc((-1.230661185, 28.630218955), (3.506954249, 26.667834389), (5.469338815, 21.930218955))
        make_face()
        with BuildLine():
            Line((40.68125, 21.725), (40.68125, 5.275))
            ThreePointArc((40.68125, 5.275), (40.344422798, 4.461827202), (39.53125, 4.125))
            Line((39.53125, 4.125), (24.58125, 4.125))
            ThreePointArc((24.58125, 4.125), (23.768077202, 4.461827202), (23.43125, 5.275))
            Line((23.43125, 5.275), (23.43125, 21.725))
            ThreePointArc((23.43125, 21.725), (23.768077202, 22.538172798), (24.58125, 22.875))
            Line((24.58125, 22.875), (39.53125, 22.875))
            ThreePointArc((39.53125, 22.875), (40.344422798, 22.538172798), (40.68125, 21.725))
        make_face()
        with BuildLine():
            ThreePointArc((-39.345661185, 27.130218955), (-40.430661185, 28.215218955), (-41.515661185, 27.130218955))
            ThreePointArc((-41.515661185, 27.130218955), (-40.430661185, 26.045218955), (-39.345661185, 27.130218955))
        make_face()
        with BuildLine():
            ThreePointArc((-40.845661185, 9.030218955), (-41.930661185, 10.115218955), (-43.015661185, 9.030218955))
            ThreePointArc((-43.015661185, 9.030218955), (-41.930661185, 7.945218955), (-40.845661185, 9.030218955))
        make_face()
        with BuildLine():
            ThreePointArc((9.554338815, 9.030218955), (8.469338815, 10.115218955), (7.384338815, 9.030218955))
            ThreePointArc((7.384338815, 9.030218955), (8.469338815, 7.945218955), (9.554338815, 9.030218955))
        make_face()
        with BuildLine():
            ThreePointArc((8.054338815, 27.130218955), (6.969338815, 28.215218955), (5.884338815, 27.130218955))
            ThreePointArc((5.884338815, 27.130218955), (6.969338815, 26.045218955), (8.054338815, 27.130218955))
        make_face()
        with Locations(Location((20.05625, 18, 0), (0, 0, 270))):
            Circle(SKETCH13_R)
        with Locations(Location((44.05625, 9, 0), (0, 0, 270))):
            Circle(SKETCH13_R)
    extrude(amount=-CUT_EXTRUDE6_DEPTH, mode=Mode.SUBTRACT)

    # Sketch15 → Boss-Extrude7 (add)
    # profile 1 of 4: a face of its own
    with BuildSketch(Plane.XY):
        with Locations((-42.71074387, -11.937295785)):
            Circle(SKETCH15_R)
        with Locations((-42.71074387, -11.937295785)):
            Circle(SKETCH15_R_2, mode=Mode.SUBTRACT)
    # profile 2 of 4: a face of its own
    with BuildSketch(Plane.XY):
        with Locations((-42.710743561, 13.970704215)):
            Circle(SKETCH15_R)
        with Locations((-42.710743561, 13.970704215)):
            Circle(SKETCH15_R_2, mode=Mode.SUBTRACT)
    # profile 3 of 4: a face of its own
    with BuildSketch(Plane.XY):
        with Locations((29.025256449, 14.878703359)):
            Circle(SKETCH15_R)
        with Locations((29.025256449, 14.878703359)):
            Circle(SKETCH15_R_2, mode=Mode.SUBTRACT)
    # profile 4 of 4: a face of its own
    with BuildSketch(Plane.XY):
        with Locations((29.025256116, -13.061296641)):
            Circle(SKETCH15_R)
        with Locations((29.025256116, -13.061296641)):
            Circle(SKETCH15_R_2, mode=Mode.SUBTRACT)
    extrude(amount=BOSS_EXTRUDE7_DEPTH)

    # Sketch16 → Cut-Extrude7 (cut)
    with BuildSketch(Plane.XY.offset(CUT_EXTRUDE7_START)):
        with Locations((29.025256116, -13.061296641)):
            Circle(SKETCH16_R)
        with Locations((29.025256449, 14.878703359)):
            Circle(SKETCH16_R)
        with Locations((-42.710743561, 13.970704215)):
            Circle(SKETCH16_R)
        with Locations((-42.71074387, -11.937295785)):
            Circle(SKETCH16_R)
    extrude(amount=CUT_EXTRUDE7_DEPTH, mode=Mode.SUBTRACT)


solid = part_1.part
